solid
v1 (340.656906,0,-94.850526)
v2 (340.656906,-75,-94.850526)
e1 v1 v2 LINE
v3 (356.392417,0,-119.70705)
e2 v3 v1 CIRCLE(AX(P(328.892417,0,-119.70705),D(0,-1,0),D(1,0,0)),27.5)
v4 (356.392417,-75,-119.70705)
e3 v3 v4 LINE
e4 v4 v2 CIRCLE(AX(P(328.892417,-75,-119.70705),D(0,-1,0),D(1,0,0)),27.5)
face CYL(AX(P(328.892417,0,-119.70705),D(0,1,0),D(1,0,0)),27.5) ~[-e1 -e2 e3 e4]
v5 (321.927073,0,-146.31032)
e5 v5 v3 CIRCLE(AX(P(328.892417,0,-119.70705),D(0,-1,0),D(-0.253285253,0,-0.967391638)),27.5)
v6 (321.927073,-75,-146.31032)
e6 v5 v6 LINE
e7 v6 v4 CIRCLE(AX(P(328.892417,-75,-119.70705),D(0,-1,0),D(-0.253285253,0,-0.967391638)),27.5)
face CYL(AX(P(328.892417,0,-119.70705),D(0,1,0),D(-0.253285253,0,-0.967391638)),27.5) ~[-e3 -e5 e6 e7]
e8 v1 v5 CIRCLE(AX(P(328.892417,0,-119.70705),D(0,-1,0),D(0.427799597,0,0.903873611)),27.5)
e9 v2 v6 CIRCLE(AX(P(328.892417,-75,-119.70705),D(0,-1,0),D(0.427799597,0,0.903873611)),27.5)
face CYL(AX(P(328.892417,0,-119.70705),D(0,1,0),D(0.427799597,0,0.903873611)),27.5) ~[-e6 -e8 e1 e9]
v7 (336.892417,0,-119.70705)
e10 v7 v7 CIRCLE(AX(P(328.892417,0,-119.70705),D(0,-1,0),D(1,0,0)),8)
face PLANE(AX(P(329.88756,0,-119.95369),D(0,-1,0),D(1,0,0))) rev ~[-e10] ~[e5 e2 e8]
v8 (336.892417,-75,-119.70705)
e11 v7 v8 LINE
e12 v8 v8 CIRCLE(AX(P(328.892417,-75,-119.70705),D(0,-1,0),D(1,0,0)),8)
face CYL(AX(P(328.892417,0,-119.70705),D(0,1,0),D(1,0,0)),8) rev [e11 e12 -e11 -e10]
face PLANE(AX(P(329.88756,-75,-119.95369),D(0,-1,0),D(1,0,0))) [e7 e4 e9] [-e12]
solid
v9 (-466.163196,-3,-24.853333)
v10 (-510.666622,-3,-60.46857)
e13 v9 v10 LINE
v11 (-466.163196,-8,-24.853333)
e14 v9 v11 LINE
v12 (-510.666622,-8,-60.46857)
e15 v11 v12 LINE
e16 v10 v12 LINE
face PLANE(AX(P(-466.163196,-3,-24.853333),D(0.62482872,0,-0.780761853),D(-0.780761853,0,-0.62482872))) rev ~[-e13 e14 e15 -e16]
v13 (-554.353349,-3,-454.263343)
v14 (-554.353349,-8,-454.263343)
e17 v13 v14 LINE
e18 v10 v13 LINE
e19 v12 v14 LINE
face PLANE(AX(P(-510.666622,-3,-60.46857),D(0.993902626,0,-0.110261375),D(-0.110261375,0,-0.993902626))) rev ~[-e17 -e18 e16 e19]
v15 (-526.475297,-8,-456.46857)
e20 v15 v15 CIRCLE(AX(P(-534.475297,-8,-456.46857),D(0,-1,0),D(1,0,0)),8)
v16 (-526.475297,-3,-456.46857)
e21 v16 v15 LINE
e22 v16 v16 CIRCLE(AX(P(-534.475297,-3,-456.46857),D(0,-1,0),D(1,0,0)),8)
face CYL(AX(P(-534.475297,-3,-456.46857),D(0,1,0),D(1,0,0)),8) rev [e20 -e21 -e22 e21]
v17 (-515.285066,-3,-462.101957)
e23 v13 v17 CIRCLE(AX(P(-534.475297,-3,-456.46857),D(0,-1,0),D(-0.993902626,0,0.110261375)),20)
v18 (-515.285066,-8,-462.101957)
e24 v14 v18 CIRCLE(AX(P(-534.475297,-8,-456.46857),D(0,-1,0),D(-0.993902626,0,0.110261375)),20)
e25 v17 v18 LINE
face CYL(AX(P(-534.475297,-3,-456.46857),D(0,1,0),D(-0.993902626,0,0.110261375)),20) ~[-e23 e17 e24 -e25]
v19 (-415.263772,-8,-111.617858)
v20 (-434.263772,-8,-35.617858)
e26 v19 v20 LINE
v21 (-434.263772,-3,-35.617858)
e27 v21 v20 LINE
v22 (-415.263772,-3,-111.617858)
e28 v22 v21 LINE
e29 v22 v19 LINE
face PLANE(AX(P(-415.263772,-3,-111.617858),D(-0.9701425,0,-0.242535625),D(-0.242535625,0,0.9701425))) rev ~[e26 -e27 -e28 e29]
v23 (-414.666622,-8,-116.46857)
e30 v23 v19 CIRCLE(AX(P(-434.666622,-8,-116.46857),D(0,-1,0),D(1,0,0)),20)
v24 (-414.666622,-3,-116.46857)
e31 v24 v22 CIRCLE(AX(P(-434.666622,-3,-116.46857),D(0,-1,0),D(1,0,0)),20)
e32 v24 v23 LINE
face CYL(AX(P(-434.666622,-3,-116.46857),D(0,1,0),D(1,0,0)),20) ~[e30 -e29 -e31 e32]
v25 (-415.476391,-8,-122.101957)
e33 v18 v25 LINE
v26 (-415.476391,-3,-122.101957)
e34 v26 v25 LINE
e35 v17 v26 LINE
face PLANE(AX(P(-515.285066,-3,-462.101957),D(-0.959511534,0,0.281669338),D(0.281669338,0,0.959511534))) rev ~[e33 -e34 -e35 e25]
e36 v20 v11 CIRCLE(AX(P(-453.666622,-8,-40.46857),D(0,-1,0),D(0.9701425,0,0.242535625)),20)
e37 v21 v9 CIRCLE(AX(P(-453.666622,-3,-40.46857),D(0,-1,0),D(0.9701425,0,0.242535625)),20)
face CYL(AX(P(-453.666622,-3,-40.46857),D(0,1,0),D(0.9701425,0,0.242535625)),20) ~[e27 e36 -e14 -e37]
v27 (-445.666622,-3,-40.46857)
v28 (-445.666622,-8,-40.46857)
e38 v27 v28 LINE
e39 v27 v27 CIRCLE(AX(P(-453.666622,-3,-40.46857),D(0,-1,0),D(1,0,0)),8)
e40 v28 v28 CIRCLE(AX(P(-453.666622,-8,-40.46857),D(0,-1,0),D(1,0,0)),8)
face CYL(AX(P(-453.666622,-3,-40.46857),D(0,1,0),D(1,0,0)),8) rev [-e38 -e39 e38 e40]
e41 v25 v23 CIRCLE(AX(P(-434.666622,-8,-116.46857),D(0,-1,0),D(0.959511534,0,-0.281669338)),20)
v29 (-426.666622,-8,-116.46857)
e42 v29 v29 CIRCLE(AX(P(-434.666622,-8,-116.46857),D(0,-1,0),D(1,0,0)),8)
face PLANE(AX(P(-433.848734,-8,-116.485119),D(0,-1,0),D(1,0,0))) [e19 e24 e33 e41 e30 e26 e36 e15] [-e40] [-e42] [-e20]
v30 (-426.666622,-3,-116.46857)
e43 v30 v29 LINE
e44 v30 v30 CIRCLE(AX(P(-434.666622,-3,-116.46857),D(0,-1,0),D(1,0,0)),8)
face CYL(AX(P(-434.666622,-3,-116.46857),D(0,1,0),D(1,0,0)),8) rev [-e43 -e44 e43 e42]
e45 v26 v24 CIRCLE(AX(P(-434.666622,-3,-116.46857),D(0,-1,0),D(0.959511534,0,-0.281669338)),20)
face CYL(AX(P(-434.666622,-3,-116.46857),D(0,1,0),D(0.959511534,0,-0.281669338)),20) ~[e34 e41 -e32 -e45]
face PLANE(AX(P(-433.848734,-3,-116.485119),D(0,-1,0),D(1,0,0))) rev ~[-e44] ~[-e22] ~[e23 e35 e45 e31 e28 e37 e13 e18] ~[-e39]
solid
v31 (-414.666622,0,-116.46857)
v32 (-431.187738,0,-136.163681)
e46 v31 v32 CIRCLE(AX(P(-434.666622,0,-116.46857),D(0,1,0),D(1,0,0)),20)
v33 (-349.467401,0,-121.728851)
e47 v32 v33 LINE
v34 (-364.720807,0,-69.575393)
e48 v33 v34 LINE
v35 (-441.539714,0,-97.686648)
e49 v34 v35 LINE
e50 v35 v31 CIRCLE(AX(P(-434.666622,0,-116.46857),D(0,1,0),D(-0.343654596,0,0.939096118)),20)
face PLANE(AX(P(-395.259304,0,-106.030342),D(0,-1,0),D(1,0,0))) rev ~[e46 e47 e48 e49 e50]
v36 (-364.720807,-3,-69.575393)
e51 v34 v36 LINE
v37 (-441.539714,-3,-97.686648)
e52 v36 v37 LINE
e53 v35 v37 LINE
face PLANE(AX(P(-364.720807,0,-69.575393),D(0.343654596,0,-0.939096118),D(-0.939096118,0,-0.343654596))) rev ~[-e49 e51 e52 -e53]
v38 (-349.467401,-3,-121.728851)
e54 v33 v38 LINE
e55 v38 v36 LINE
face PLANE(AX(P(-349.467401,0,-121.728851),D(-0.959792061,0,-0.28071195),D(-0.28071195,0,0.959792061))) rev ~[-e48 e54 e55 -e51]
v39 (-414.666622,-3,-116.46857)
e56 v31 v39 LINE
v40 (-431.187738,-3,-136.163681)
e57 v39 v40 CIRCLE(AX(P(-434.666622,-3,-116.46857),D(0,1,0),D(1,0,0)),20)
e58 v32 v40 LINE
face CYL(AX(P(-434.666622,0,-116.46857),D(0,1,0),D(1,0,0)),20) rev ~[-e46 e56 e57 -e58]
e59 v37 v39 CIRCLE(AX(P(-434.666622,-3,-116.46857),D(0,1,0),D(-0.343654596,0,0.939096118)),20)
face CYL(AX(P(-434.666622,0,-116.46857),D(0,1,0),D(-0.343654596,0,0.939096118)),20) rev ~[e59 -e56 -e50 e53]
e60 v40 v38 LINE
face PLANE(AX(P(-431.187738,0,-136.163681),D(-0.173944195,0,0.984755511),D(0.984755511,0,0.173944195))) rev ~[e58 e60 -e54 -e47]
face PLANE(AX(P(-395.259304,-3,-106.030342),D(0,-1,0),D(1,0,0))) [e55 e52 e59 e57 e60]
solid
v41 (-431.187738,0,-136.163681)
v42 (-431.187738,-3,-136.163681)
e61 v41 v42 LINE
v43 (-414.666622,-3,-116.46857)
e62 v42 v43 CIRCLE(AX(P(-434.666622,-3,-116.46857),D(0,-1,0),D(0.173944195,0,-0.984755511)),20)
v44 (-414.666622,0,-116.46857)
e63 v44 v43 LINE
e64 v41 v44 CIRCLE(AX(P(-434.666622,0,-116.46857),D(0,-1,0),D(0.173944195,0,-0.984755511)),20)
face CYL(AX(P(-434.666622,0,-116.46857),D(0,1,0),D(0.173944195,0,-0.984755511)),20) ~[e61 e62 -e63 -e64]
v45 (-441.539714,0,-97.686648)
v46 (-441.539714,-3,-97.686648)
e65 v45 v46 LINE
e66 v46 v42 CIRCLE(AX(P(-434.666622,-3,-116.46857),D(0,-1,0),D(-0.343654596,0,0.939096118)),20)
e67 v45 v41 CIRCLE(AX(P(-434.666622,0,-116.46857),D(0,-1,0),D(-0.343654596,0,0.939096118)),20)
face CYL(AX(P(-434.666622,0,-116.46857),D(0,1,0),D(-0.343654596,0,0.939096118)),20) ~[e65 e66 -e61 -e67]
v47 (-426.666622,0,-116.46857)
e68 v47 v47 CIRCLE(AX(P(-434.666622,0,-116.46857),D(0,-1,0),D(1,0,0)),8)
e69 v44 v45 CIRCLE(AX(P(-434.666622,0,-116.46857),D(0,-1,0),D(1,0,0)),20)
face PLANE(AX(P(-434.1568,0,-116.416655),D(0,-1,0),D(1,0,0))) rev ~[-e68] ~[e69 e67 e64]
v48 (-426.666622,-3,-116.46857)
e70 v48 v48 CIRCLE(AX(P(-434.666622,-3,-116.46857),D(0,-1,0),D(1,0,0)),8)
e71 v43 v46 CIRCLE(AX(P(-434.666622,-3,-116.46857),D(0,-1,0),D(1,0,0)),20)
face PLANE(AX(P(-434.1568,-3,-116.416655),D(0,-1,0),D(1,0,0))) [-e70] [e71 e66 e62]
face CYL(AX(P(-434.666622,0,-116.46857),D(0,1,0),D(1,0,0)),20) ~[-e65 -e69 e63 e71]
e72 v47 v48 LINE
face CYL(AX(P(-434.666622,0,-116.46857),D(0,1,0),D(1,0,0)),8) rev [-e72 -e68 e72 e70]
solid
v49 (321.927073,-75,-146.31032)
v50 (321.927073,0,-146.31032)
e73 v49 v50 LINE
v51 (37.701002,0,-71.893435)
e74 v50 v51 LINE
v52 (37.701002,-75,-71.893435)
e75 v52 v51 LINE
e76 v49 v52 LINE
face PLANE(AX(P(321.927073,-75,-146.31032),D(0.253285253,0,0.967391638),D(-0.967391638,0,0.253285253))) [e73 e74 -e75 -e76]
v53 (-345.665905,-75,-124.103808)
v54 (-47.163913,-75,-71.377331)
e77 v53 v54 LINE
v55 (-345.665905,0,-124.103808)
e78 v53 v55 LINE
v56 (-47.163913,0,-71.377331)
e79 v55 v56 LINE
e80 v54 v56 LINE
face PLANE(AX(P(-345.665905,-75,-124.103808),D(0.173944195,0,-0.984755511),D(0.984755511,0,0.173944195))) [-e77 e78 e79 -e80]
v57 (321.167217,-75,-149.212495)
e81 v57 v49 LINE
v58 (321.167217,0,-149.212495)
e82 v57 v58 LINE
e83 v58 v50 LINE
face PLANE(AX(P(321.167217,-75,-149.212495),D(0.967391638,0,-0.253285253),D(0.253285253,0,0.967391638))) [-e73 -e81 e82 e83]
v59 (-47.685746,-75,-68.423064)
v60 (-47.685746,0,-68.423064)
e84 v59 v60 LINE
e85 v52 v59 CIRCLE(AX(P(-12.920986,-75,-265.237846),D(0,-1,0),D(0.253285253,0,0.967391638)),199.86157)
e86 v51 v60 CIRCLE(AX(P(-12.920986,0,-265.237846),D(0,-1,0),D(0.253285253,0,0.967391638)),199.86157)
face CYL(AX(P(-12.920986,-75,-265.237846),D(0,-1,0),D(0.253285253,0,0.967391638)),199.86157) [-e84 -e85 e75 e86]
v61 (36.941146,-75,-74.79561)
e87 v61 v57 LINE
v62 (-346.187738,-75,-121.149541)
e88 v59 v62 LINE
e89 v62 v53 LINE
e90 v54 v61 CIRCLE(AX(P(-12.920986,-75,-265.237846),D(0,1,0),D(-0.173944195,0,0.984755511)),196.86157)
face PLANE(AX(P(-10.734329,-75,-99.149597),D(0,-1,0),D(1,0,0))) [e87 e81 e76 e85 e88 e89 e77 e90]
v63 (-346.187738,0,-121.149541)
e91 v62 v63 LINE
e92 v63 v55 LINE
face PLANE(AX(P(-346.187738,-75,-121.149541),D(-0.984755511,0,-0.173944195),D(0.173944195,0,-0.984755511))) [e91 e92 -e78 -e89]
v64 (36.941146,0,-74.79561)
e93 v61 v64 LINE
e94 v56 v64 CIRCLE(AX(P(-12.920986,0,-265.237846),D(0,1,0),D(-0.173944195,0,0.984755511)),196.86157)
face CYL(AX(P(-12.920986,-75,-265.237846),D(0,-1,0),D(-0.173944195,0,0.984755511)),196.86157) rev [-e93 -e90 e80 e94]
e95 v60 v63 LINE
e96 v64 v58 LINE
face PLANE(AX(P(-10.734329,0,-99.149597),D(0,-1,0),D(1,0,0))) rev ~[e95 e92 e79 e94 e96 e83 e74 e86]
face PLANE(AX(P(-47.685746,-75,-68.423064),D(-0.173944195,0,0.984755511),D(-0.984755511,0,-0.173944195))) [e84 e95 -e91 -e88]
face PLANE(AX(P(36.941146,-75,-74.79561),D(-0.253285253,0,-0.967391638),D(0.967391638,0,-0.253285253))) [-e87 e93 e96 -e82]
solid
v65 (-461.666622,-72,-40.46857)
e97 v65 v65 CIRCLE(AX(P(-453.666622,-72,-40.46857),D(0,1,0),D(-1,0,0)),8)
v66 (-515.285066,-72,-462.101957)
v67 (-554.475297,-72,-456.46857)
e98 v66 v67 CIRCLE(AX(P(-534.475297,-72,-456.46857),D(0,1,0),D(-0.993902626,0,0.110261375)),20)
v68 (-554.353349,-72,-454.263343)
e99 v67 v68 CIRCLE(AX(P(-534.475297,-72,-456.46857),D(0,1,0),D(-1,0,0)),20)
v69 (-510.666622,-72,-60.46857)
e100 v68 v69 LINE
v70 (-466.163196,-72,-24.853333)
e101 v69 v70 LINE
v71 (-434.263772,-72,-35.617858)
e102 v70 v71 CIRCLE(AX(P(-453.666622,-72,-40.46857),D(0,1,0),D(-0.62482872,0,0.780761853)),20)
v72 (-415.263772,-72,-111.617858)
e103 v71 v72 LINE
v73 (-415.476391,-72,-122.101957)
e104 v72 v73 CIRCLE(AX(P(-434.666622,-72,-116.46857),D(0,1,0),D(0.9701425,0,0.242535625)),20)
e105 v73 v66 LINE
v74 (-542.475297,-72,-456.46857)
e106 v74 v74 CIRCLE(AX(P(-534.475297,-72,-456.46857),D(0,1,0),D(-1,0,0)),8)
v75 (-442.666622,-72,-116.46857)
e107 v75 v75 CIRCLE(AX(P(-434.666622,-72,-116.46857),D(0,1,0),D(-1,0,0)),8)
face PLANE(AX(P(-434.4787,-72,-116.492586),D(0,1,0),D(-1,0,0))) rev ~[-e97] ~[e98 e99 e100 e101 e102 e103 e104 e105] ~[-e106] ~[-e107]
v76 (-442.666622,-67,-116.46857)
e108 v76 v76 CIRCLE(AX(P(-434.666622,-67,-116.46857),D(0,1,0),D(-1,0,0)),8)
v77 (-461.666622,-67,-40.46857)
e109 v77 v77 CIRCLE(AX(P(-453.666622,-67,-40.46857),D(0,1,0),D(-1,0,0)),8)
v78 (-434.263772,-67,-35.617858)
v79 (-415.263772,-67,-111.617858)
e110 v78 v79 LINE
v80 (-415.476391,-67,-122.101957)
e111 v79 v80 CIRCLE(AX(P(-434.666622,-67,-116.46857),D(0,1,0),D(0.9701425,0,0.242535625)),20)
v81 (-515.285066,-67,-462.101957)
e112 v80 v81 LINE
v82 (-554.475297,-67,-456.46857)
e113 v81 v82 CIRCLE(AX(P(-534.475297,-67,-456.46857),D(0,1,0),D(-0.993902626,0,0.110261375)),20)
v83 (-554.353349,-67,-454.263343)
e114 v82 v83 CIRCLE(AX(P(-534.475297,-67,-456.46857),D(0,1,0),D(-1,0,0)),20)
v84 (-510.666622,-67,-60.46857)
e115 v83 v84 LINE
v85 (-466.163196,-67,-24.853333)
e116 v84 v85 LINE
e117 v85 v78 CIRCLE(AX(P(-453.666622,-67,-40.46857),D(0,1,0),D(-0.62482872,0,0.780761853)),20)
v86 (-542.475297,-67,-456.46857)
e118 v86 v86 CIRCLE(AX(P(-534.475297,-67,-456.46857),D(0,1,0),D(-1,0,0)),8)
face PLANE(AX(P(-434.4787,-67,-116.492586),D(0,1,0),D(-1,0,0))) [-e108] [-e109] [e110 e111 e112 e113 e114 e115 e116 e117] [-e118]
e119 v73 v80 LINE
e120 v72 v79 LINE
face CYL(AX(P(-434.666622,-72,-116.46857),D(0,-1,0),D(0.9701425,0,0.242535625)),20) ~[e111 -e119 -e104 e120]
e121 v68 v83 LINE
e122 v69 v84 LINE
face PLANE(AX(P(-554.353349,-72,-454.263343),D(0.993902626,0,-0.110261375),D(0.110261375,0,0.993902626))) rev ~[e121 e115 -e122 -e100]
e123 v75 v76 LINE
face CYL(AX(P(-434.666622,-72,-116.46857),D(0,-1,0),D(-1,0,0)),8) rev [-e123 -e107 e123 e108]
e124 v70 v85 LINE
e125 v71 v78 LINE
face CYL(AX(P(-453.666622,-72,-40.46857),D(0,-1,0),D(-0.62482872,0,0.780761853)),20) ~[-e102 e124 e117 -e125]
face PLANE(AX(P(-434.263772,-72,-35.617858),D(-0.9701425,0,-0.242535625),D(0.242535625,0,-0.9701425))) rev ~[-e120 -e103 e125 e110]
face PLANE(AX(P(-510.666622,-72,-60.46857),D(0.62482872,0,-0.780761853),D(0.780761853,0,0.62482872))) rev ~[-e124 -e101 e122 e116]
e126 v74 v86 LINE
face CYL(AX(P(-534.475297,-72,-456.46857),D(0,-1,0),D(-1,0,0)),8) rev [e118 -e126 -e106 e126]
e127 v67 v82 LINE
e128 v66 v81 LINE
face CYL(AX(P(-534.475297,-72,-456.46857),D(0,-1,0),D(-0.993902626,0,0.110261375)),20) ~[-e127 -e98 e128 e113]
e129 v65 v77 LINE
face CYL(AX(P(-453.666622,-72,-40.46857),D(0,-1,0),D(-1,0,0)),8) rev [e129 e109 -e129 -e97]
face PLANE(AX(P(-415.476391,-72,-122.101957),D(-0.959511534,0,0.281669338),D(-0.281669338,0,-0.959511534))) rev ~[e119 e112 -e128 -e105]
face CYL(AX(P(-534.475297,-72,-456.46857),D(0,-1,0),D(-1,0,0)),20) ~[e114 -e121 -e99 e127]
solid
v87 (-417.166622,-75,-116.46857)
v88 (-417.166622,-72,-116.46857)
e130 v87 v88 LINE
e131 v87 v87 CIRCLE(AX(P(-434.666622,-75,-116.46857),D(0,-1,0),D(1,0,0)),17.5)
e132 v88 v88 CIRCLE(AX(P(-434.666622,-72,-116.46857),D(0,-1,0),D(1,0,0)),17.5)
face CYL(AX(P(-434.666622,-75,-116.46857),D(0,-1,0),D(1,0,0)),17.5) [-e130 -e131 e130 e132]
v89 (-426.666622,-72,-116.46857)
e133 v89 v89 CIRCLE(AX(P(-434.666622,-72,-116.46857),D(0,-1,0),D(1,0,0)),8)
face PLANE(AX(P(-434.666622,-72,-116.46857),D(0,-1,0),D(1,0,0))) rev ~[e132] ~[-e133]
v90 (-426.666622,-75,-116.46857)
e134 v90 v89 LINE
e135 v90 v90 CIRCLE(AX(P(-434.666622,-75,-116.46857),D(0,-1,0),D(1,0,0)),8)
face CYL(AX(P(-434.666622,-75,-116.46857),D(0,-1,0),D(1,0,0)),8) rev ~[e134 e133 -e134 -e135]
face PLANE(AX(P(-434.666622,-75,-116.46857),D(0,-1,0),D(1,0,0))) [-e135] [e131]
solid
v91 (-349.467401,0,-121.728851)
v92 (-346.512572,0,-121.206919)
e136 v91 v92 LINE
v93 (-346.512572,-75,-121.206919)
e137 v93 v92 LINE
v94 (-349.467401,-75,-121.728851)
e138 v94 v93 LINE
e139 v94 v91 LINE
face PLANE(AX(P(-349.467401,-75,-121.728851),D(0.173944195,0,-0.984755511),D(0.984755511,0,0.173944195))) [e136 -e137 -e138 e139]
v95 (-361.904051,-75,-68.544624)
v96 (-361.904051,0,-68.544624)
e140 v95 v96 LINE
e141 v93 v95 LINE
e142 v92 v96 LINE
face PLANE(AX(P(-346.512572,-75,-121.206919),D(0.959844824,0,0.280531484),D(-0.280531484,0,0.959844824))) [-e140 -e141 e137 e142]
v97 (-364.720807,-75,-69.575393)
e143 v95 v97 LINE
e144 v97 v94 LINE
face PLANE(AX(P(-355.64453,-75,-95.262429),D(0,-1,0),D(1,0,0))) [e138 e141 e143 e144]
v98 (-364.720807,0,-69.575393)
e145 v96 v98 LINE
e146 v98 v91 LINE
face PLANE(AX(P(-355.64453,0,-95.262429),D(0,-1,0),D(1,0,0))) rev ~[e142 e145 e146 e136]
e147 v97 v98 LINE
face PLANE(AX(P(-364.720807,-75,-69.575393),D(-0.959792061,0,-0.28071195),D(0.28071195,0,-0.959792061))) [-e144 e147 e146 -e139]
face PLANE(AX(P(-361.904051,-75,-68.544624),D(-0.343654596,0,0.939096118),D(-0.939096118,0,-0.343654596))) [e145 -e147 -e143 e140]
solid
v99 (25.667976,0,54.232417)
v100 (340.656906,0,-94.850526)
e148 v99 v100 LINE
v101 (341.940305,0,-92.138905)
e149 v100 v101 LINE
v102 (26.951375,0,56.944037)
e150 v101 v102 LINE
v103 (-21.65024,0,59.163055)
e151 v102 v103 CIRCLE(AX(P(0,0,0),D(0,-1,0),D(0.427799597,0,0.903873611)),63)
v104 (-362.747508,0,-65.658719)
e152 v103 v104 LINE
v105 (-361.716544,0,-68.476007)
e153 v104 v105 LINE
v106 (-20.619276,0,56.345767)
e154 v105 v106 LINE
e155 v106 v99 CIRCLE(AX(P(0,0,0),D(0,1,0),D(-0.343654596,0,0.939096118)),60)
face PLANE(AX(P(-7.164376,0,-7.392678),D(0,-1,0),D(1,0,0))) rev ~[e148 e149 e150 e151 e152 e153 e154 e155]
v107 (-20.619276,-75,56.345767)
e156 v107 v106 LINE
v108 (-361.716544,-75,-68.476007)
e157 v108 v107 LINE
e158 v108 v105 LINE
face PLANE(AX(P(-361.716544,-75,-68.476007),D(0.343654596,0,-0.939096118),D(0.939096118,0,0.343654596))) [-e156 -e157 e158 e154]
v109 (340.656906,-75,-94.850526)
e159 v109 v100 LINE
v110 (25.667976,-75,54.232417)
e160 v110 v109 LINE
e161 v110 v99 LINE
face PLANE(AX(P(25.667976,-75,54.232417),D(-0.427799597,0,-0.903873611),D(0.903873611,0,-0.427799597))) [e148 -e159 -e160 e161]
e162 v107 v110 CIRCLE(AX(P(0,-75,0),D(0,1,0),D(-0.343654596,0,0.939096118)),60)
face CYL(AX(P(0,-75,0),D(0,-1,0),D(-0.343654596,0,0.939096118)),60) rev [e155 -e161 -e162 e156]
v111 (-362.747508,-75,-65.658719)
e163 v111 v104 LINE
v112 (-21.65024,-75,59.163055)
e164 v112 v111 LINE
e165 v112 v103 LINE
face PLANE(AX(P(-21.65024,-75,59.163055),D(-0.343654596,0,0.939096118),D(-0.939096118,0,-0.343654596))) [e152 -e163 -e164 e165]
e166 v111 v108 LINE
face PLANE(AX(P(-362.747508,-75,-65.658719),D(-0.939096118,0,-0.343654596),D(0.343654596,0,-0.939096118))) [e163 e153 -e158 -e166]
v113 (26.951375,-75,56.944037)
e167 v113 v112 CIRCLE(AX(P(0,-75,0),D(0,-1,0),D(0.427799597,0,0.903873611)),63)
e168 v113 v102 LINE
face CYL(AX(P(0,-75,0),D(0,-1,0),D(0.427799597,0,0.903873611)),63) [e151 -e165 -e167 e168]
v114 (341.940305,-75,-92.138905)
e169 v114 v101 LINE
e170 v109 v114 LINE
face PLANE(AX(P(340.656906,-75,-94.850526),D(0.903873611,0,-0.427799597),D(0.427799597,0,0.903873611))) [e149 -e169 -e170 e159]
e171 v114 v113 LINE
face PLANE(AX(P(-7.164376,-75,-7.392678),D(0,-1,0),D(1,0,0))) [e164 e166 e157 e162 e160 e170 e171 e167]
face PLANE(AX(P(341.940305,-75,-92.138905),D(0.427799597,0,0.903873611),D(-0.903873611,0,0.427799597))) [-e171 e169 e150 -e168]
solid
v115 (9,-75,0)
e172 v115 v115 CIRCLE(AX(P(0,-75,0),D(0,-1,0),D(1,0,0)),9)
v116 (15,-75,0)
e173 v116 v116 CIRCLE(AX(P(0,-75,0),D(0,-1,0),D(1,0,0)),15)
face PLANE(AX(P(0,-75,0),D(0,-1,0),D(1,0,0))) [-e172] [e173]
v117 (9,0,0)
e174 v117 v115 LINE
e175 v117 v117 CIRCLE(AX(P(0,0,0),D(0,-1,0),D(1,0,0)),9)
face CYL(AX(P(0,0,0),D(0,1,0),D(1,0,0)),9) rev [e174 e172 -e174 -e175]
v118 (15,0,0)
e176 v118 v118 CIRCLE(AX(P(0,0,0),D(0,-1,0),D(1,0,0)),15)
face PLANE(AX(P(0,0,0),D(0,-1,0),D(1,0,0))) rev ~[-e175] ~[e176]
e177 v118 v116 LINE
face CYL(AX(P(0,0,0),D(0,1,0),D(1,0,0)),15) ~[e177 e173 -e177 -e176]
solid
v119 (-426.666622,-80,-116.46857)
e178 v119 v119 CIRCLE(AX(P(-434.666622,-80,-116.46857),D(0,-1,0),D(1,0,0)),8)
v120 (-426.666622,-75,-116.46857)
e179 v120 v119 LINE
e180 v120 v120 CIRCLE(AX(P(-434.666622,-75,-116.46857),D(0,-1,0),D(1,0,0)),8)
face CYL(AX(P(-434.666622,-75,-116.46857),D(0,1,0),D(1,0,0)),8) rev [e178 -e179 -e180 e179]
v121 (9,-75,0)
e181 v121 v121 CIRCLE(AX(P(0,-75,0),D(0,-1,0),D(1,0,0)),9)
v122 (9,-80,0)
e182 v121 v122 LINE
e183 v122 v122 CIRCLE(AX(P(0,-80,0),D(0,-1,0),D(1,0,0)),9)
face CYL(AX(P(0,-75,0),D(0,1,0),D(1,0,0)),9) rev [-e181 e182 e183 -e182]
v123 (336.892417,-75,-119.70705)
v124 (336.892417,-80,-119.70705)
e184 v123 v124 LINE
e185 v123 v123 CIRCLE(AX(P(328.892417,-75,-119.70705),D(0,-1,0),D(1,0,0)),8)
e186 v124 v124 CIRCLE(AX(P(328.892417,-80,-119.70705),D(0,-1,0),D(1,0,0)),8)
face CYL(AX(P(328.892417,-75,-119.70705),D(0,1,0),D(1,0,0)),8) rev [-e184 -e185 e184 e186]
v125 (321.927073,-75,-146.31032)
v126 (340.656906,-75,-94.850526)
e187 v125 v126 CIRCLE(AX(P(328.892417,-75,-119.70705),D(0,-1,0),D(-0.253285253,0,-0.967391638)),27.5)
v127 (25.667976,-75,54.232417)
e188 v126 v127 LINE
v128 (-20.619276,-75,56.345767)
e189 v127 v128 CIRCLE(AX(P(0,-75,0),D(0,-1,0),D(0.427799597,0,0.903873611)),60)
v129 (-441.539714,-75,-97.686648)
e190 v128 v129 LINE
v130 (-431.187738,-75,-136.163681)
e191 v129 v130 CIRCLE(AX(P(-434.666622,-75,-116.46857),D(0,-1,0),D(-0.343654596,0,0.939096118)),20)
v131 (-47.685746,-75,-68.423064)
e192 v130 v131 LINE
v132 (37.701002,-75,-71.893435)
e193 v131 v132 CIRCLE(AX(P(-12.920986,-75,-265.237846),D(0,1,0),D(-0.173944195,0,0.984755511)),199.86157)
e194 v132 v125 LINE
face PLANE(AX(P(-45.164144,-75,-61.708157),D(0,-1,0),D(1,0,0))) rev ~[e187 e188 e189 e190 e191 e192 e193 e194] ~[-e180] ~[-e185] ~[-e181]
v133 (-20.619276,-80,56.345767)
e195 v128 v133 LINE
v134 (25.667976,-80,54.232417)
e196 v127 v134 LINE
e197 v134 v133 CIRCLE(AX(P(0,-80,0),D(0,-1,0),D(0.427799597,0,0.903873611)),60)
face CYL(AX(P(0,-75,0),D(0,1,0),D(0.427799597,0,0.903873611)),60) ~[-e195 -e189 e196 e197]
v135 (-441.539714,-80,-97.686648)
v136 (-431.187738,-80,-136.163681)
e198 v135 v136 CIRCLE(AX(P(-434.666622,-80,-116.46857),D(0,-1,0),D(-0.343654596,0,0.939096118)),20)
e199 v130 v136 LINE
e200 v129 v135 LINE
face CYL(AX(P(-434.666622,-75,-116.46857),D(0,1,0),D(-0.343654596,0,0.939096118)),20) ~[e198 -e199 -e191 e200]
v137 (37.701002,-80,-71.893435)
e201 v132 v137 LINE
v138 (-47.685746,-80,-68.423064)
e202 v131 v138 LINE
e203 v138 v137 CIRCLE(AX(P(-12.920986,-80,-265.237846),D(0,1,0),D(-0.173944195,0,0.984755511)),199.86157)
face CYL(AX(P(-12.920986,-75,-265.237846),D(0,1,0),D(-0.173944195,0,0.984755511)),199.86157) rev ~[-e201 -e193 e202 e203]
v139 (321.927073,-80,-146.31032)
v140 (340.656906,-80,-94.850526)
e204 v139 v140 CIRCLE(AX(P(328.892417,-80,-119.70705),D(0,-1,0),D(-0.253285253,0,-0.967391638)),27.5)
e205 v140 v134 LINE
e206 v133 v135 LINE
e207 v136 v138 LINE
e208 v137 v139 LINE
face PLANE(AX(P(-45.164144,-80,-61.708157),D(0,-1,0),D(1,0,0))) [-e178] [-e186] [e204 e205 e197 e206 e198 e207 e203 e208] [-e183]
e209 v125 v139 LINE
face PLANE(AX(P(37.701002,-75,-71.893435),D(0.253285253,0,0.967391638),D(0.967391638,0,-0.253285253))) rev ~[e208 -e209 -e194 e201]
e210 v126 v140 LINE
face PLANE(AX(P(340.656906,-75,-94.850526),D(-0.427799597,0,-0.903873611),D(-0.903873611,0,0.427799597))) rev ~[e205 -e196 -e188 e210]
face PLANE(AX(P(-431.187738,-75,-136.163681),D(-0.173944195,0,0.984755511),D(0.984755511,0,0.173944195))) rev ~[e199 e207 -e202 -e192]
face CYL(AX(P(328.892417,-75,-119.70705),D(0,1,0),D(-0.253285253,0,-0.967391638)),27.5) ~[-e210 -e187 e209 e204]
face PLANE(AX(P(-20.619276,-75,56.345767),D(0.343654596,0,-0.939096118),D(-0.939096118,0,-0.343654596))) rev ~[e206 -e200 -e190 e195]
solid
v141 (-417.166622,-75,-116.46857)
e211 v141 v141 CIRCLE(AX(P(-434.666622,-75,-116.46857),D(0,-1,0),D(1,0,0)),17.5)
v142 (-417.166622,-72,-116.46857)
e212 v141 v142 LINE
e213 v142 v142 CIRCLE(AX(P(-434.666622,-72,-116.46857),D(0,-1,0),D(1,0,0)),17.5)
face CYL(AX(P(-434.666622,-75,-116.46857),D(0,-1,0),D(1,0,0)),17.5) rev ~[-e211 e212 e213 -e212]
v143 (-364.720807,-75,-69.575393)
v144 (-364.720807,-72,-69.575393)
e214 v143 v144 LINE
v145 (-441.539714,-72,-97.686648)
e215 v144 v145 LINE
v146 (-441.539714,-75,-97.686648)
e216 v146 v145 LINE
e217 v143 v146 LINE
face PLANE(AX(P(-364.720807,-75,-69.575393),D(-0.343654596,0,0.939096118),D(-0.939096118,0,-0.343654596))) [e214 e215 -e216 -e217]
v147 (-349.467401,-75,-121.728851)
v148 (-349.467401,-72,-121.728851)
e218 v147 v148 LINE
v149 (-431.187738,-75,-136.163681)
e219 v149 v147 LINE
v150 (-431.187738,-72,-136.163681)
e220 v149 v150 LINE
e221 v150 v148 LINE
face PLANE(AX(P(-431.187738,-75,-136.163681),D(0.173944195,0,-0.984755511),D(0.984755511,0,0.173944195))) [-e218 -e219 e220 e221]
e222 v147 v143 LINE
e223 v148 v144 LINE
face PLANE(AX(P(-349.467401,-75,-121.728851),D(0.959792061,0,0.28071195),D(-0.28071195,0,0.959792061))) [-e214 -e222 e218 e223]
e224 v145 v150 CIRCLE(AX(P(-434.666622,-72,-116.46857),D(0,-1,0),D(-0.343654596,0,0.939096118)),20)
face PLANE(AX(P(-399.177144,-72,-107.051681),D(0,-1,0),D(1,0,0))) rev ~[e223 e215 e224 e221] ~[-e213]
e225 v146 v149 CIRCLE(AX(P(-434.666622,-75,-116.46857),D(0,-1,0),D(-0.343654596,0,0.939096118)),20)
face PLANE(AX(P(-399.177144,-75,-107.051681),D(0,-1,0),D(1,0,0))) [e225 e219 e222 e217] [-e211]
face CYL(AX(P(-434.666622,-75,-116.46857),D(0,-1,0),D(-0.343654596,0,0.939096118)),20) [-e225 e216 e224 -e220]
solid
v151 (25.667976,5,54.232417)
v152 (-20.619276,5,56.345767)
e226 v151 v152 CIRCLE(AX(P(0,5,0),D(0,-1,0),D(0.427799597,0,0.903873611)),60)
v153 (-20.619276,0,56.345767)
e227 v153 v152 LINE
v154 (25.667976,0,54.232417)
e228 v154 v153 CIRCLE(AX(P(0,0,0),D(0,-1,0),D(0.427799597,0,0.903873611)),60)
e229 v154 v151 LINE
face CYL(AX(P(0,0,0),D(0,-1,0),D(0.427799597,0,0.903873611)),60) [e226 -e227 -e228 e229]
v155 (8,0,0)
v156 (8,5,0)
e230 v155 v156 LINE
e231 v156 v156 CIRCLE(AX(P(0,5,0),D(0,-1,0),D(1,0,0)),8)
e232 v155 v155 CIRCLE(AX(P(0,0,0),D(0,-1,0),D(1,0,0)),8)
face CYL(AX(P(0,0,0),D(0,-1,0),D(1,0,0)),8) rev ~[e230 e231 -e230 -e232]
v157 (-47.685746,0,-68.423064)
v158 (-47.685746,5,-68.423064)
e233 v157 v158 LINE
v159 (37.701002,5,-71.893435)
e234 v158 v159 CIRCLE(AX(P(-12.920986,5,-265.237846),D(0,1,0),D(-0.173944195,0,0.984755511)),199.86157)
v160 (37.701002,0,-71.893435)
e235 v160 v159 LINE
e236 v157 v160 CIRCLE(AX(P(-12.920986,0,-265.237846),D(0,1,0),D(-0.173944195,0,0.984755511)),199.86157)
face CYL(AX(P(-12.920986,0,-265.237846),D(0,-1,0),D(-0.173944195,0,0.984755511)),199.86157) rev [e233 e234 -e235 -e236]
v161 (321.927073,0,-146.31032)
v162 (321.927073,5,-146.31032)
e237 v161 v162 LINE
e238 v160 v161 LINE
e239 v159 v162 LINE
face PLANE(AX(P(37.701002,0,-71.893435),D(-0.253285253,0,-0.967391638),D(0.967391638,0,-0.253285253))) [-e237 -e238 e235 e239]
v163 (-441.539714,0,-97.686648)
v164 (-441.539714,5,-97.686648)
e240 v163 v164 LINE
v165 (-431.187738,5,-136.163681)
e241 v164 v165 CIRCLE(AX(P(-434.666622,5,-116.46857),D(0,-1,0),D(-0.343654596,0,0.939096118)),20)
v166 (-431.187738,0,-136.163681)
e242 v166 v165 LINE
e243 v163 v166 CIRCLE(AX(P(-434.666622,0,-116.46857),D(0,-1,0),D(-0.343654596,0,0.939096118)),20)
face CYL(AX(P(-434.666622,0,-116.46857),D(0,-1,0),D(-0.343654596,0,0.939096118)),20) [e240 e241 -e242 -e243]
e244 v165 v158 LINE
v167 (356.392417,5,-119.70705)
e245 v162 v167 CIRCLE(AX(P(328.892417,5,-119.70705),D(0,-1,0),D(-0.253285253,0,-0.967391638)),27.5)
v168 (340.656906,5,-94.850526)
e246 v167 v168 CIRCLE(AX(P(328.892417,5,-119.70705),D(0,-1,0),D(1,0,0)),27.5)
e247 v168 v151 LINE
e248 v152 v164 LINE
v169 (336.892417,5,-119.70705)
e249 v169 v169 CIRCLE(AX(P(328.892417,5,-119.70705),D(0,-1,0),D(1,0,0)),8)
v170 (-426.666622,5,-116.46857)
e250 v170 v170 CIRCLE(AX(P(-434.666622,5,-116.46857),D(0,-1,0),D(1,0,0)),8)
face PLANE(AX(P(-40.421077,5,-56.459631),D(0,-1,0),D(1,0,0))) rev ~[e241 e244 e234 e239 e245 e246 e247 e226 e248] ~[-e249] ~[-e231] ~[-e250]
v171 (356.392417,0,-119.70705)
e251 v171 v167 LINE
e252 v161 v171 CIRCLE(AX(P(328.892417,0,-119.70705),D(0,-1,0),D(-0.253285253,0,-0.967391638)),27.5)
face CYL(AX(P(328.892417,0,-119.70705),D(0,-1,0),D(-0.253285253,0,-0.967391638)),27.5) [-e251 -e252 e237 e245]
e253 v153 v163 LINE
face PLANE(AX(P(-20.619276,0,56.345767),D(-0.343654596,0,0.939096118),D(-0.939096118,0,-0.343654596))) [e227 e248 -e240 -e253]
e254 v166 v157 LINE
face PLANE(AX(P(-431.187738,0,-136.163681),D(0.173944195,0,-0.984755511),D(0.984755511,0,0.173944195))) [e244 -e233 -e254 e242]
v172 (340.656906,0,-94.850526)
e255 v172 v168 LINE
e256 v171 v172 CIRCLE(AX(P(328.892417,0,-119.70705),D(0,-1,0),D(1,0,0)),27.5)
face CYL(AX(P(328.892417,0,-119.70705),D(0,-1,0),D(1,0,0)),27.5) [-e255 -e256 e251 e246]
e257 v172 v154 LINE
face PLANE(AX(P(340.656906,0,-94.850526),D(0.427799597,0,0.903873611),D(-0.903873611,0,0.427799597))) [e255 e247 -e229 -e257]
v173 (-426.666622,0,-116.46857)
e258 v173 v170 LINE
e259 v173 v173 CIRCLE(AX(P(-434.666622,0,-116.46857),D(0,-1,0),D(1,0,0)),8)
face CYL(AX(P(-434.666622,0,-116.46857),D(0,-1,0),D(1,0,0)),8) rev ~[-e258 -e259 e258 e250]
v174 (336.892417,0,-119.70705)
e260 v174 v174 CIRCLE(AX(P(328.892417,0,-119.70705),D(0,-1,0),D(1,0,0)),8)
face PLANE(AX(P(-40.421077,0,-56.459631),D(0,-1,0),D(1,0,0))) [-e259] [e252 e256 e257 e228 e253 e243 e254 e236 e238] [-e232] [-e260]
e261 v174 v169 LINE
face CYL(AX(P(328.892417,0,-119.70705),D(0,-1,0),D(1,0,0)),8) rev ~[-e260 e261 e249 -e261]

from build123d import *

# Parameters (mm, degrees)
F0_R      = 17.5
F0_R_2    = 8
F1_DEPTH  = 5
F0_R_3    = 15
F0_R_4    = 22.5
F0_R_5    = 9
F2_DEPTH  = 5
F4_R      = 17.5
F4_R_2    = 22.5
F4_R_3    = 9
F4_R_4    = 8
F5_DEPTH  = 5
F6_DEPTH  = 75
F7_DEPTH  = 75
F9_DEPTH  = 75
F10_DEPTH = 75
F11_DEPTH = 75
F8_R      = 17.5
F12_DEPTH = 3
F14_DEPTH = 3
F16_R     = 17.5
F16_R_2   = 8
F17_DEPTH = 5
F19_R     = 17.5
F19_R_2   = 8
F20_DEPTH = 5


# Not quite as in the source:
# - a feature names something its author has since deleted; it is built from what else it names


with BuildPart() as f1:
    # F0 (on Front) → F1 (new body)
    with BuildSketch(Plane.XZ):
        with Locations((-434.6666218301, -116.4685702961)):
            Circle(F0_R)
        with Locations((-434.6666218301, -116.4685702961)):
            Circle(F0_R_2, mode=Mode.SUBTRACT)
    extrude(amount=F1_DEPTH)


with BuildPart() as f2:
    # F0 (on Front) → F2 (new body)
    with BuildSketch(Plane.XZ):
        with BuildLine():
            ThreePointArc((25.6679758413, 54.2324166547), (50.6955547878, 32.0930011803), (60, 0))
            ThreePointArc((60, 0), (-34.3718158899, -49.1790430207), (-20.6192757477, 56.3457670783))
            Line((-20.6192757477, 56.3457670783), (-441.539713746, -97.6866479367))
            ThreePointArc((-441.539713746, -97.6866479367), (-423.2093498668, -100.0755559559), (-414.6666218301, -116.4685702961))
            ThreePointArc((-414.6666218301, -116.4685702961), (-419.3438009709, -129.3220196743), (-431.1877379217, -136.1636805206))
            Line((-431.1877379217, -136.1636805206), (-47.6857460535, -68.4230640354))
            ThreePointArc((-47.6857460535, -68.4230640354), (-4.8047190164, -65.5411431254), (37.7010021837, -71.8934350856))
            Line((37.7010021837, -71.8934350856), (321.927072804, -146.310320196))
            ThreePointArc((321.927072804, -146.310320196), (303.0508702035, -110.3014962225), (340.6569062023, -94.8505258639))
            Line((340.6569062023, -94.8505258639), (25.6679758413, 54.2324166547))
        make_face()
        with BuildLine():
            ThreePointArc((-20.6192757477, 56.3457670783), (-34.3718158899, -49.1790430207), (60, 0))
            ThreePointArc((60, 0), (50.6955547878, 32.0930011803), (25.6679758413, 54.2324166547))
            ThreePointArc((25.6679758413, 54.2324166547), (2.7365864982, 59.9375599632), (-20.6192757477, 56.3457670783))
        make_face()
        Circle(F0_R_3, mode=Mode.SUBTRACT)
        with BuildLine():
            ThreePointArc((356.3924172751, -119.707050164), (352.1278798861, -104.9977579563), (340.6569062023, -94.8505258639))
            ThreePointArc((340.6569062023, -94.8505258639), (303.0508702035, -110.3014962225), (321.927072804, -146.310320196))
            ThreePointArc((321.927072804, -146.310320196), (345.6957358021, -141.476259761), (356.3924172751, -119.707050164))
        make_face()
        with Locations((328.8924172751, -119.707050164)):
            Circle(F0_R_4, mode=Mode.SUBTRACT)
        with Locations((328.8924172751, -119.707050164)):
            Circle(F0_R_4)
        with Locations((328.8924172751, -119.707050164)):
            Circle(F0_R_2, mode=Mode.SUBTRACT)
        with BuildLine():
            ThreePointArc((-414.6666218301, -116.4685702961), (-423.2093498668, -100.0755559559), (-441.539713746, -97.6866479367))
            ThreePointArc((-441.539713746, -97.6866479367), (-453.9798471204, -121.6646581405), (-431.1877379217, -136.1636805206))
            ThreePointArc((-431.1877379217, -136.1636805206), (-419.3438009709, -129.3220196743), (-414.6666218301, -116.4685702961))
        make_face()
        with Locations((-434.6666218301, -116.4685702961)):
            Circle(F0_R, mode=Mode.SUBTRACT)
        with Locations((-434.6666218301, -116.4685702961)):
            Circle(F0_R)
        with Locations((-434.6666218301, -116.4685702961)):
            Circle(F0_R_2, mode=Mode.SUBTRACT)
        Circle(F0_R_3)
        Circle(F0_R_5, mode=Mode.SUBTRACT)
        Circle(F0_R_5)
        Circle(F0_R_2, mode=Mode.SUBTRACT)
    extrude(amount=-F2_DEPTH)


with BuildPart() as f5:
    # F4 (on offset) → F5 (new body)
    with BuildSketch(Plane.XZ.offset(75)):
        with BuildLine():
            Line((340.6569062023, -94.8505258639), (25.6679758413, 54.2324166547))
            ThreePointArc((25.6679758413, 54.2324166547), (2.7365864982, 59.9375599632), (-20.6192757477, 56.3457670783))
            Line((-20.6192757477, 56.3457670783), (-441.539713746, -97.6866479367))
            ThreePointArc((-441.539713746, -97.6866479367), (-453.9798471204, -121.6646581405), (-431.1877379217, -136.1636805206))
            Line((-431.1877379217, -136.1636805206), (-47.6857460535, -68.4230640354))
            ThreePointArc((-47.6857460535, -68.4230640354), (-4.8047190164, -65.5411431254), (37.7010021837, -71.8934350856))
            Line((37.7010021837, -71.8934350856), (321.927072804, -146.310320196))
            ThreePointArc((321.927072804, -146.310320196), (354.7339643467, -129.1126041054), (340.6569062023, -94.8505258639))
        make_face()
        with Locations((-434.6666218301, -116.4685702961)):
            Circle(F4_R, mode=Mode.SUBTRACT)
        with Locations((328.8924172751, -119.707050164)):
            Circle(F4_R_2, mode=Mode.SUBTRACT)
        Circle(F4_R_3, mode=Mode.SUBTRACT)
        with Locations((328.8924172751, -119.707050164)):
            Circle(F4_R_2)
        with Locations((328.8924172751, -119.707050164)):
            Circle(F4_R_4, mode=Mode.SUBTRACT)
        with Locations((-434.6666218301, -116.4685702961)):
            Circle(F4_R)
        with Locations((-434.6666218301, -116.4685702961)):
            Circle(F4_R_4, mode=Mode.SUBTRACT)
    extrude(amount=F5_DEPTH)


with BuildPart() as f6:
    # F0 (on Front) → F6 (new body, through all)
    with BuildSketch(Plane.XZ):
        with BuildLine():
            ThreePointArc((356.3924172751, -119.707050164), (352.1278798861, -104.9977579563), (340.6569062023, -94.8505258639))
            ThreePointArc((340.6569062023, -94.8505258639), (303.0508702035, -110.3014962225), (321.927072804, -146.310320196))
            ThreePointArc((321.927072804, -146.310320196), (345.6957358021, -141.476259761), (356.3924172751, -119.707050164))
        make_face()
        with Locations((328.8924172751, -119.707050164)):
            Circle(F0_R_4, mode=Mode.SUBTRACT)
        with Locations((328.8924172751, -119.707050164)):
            Circle(F0_R_4)
        with Locations((328.8924172751, -119.707050164)):
            Circle(F0_R_2, mode=Mode.SUBTRACT)
    extrude(amount=F6_DEPTH)


with BuildPart() as f7:
    # F0 (on Front) → F7 (new body, through all)
    with BuildSketch(Plane.XZ):
        Circle(F0_R_3)
        Circle(F0_R_5, mode=Mode.SUBTRACT)
    extrude(amount=F7_DEPTH)


with BuildPart() as f9:
    # F8 (on face) → F9 (new body, through all)
    with BuildSketch(Plane.XZ.offset(75)):
        with BuildLine():
            Line((-361.7165437184, -68.4760072941), (-20.6192757477, 56.3457670783))
            ThreePointArc((-20.6192757477, 56.3457670783), (2.7365864982, 59.9375599632), (25.6679758413, 54.2324166547))
            Line((25.6679758413, 54.2324166547), (340.6569062023, -94.8505258639))
            Line((340.6569062023, -94.8505258639), (341.9403049944, -92.1389050312))
            Line((341.9403049944, -92.1389050312), (26.9513746334, 56.9440374875))
            ThreePointArc((26.9513746334, 56.9440374875), (2.8734158231, 62.9344379613), (-21.6502395351, 59.1630554322))
            Line((-21.6502395351, 59.1630554322), (-362.7475075058, -65.6587189402))
            Line((-362.7475075058, -65.6587189402), (-361.7165437184, -68.4760072941))
        make_face()
    extrude(amount=-F9_DEPTH)


with BuildPart() as f10:
    # F8 (on face) → F10 (new body, through all)
    with BuildSketch(Plane.XZ.offset(75)):
        with BuildLine():
            Line((321.1672170435, -149.2124951086), (321.927072804, -146.310320196))
            Line((321.927072804, -146.310320196), (37.7010021837, -71.8934350856))
            ThreePointArc((37.7010021837, -71.8934350856), (-4.8047190164, -65.5411431254), (-47.6857460535, -68.4230640354))
            Line((-47.6857460535, -68.4230640354), (-346.1877379217, -121.1495410289))
            Line((-346.1877379217, -121.1495410289), (-345.6659053354, -124.1038075626))
            Line((-345.6659053354, -124.1038075626), (-47.1639134672, -71.3773305691))
            ThreePointArc((-47.1639134672, -71.3773305691), (-4.9265473469, -68.5386684143), (36.9411464232, -74.7956099982))
            Line((36.9411464232, -74.7956099982), (321.1672170435, -149.2124951086))
        make_face()
    extrude(amount=-F10_DEPTH)


with BuildPart() as f11:
    # F8 (on face) → F11 (new body, through all)
    with BuildSketch(Plane.XZ.offset(75)):
        Polygon((-346.5125719091, -121.2069187089), (-361.9040511092, -68.5446241006), (-364.7208074131, -69.5753931886), (-349.4674006349, -121.728850599), align=None)
    extrude(amount=-F11_DEPTH)


with BuildPart() as f12:
    # F8 (on face) → F12 (new body)
    with BuildSketch(Plane.XZ.offset(75)):
        with BuildLine():
            Line((-349.4674006349, -121.728850599), (-364.7208074131, -69.5753931886))
            Line((-364.7208074131, -69.5753931886), (-441.539713746, -97.6866479367))
            ThreePointArc((-441.539713746, -97.6866479367), (-453.9798471204, -121.6646581405), (-431.1877379217, -136.1636805206))
            Line((-431.1877379217, -136.1636805206), (-349.4674006349, -121.728850599))
        make_face()
        with Locations((-434.6666218301, -116.4685702961)):
            Circle(F8_R, mode=Mode.SUBTRACT)
    extrude(amount=-F12_DEPTH)


with BuildPart() as f12b:
    # F4 (on offset) → F12, piece 2 (new body)
    with BuildSketch(Plane.XZ.offset(75)):
        with Locations((-434.6666218301, -116.4685702961)):
            Circle(F4_R)
        with Locations((-434.6666218301, -116.4685702961)):
            Circle(F4_R_4, mode=Mode.SUBTRACT)
    extrude(amount=-F12_DEPTH)


with BuildPart() as f14:
    # F13 (on face) → F14 (new body)
    with BuildSketch(Plane.XZ):
        with BuildLine():
            Line((-349.4674006349, -121.728850599), (-364.7208074131, -69.5753931886))
            Line((-364.7208074131, -69.5753931886), (-441.539713746, -97.6866479367))
            ThreePointArc((-441.539713746, -97.6866479367), (-423.2093498668, -100.0755559559), (-414.6666218301, -116.4685702961))
            ThreePointArc((-414.6666218301, -116.4685702961), (-419.3438009709, -129.3220196743), (-431.1877379217, -136.1636805206))
            Line((-431.1877379217, -136.1636805206), (-349.4674006349, -121.728850599))
        make_face()
    extrude(amount=F14_DEPTH)


with BuildPart() as f14b:
    # F0 (on Front) → F14, piece 2 (new body)
    with BuildSketch(Plane.XZ):
        with BuildLine():
            ThreePointArc((-414.6666218301, -116.4685702961), (-423.2093498668, -100.0755559559), (-441.539713746, -97.6866479367))
            ThreePointArc((-441.539713746, -97.6866479367), (-453.9798471204, -121.6646581405), (-431.1877379217, -136.1636805206))
            ThreePointArc((-431.1877379217, -136.1636805206), (-419.3438009709, -129.3220196743), (-414.6666218301, -116.4685702961))
        make_face()
        with Locations((-434.6666218301, -116.4685702961)):
            Circle(F0_R, mode=Mode.SUBTRACT)
        with Locations((-434.6666218301, -116.4685702961)):
            Circle(F0_R)
        with Locations((-434.6666218301, -116.4685702961)):
            Circle(F0_R_2, mode=Mode.SUBTRACT)
    extrude(amount=F14_DEPTH)


with BuildPart() as f17:
    # F16 (on offset) → F17 (new body)
    with BuildSketch(Plane(origin=(0, -72, 0), x_dir=(-1, 0, 0), z_dir=(0, 1, 0))):
        with BuildLine():
            ThreePointArc((415.476391148, -122.1019570545), (437.5122664283, -136.2650928903), (454.6666218301, -116.4685702961))
            ThreePointArc((454.6666218301, -116.4685702961), (437.110287104, -96.6184191625), (415.2637718272, -111.6178577954))
            ThreePointArc((415.2637718272, -111.6178577954), (414.670733415, -116.8740903231), (415.476391148, -122.1019570545))
        make_face()
        with Locations((434.6666218301, -116.4685702961)):
            Circle(F16_R, mode=Mode.SUBTRACT)
        with BuildLine():
            ThreePointArc((415.2637718272, -111.6178577954), (437.110287104, -96.6184191625), (454.6666218301, -116.4685702961))
            ThreePointArc((454.6666218301, -116.4685702961), (437.5122664283, -136.2650928903), (415.476391148, -122.1019570545))
            Line((415.476391148, -122.1019570545), (515.2850661759, -462.1019570545))
            ThreePointArc((515.2850661759, -462.1019570545), (530.5409299312, -436.8593694739), (554.3533493694, -454.26334279))
            Line((554.3533493694, -454.26334279), (510.6666218301, -60.4685702961))
            Line((510.6666218301, -60.4685702961), (466.163196234, -24.8533332449))
            ThreePointArc((466.163196234, -24.8533332449), (471.693428093, -31.8063387153), (473.6666218301, -40.4685702961))
            ThreePointArc((473.6666218301, -40.4685702961), (451.2229565562, -60.3187214298), (434.2637718272, -35.6178577954))
            Line((434.2637718272, -35.6178577954), (415.2637718272, -111.6178577954))
        make_face()
        with BuildLine():
            ThreePointArc((466.163196234, -24.8533332449), (447.2718655515, -21.5184491319), (434.2637718272, -35.6178577954))
            ThreePointArc((434.2637718272, -35.6178577954), (451.2229565562, -60.3187214298), (473.6666218301, -40.4685702961))
            ThreePointArc((473.6666218301, -40.4685702961), (471.693428093, -31.8063387153), (466.163196234, -24.8533332449))
        make_face()
        with Locations((453.6666218301, -40.4685702961)):
            Circle(F16_R_2, mode=Mode.SUBTRACT)
        with BuildLine():
            ThreePointArc((554.3533493694, -454.26334279), (530.5409299312, -436.8593694739), (515.2850661759, -462.1019570545))
            ThreePointArc((515.2850661759, -462.1019570545), (537.3209414562, -476.2650928903), (554.475296858, -456.4685702961))
            ThreePointArc((554.475296858, -456.4685702961), (554.4447867141, -455.364271928), (554.3533493694, -454.26334279))
        make_face()
        with Locations((534.475296858, -456.4685702961)):
            Circle(F16_R_2, mode=Mode.SUBTRACT)
        with Locations((434.6666218301, -116.4685702961)):
            Circle(F16_R)
        with Locations((434.6666218301, -116.4685702961)):
            Circle(F16_R_2, mode=Mode.SUBTRACT)
    extrude(amount=F17_DEPTH)


with BuildPart() as f20:
    # F19 (on face) → F20 (new body)
    with BuildSketch(Plane.XZ.offset(3)):
        with BuildLine():
            ThreePointArc((-415.476391148, -122.1019570545), (-414.8700992359, -119.3142148944), (-414.6666218301, -116.4685702961))
            ThreePointArc((-414.6666218301, -116.4685702961), (-414.8164706964, -114.0249050222), (-415.2637718272, -111.6178577954))
            ThreePointArc((-415.2637718272, -111.6178577954), (-454.6625102451, -116.0630502691), (-415.476391148, -122.1019570545))
        make_face()
        with Locations((-434.6666218301, -116.4685702961)):
            Circle(F19_R, mode=Mode.SUBTRACT)
        with BuildLine():
            ThreePointArc((-415.476391148, -122.1019570545), (-454.6625102451, -116.0630502691), (-415.2637718272, -111.6178577954))
            Line((-415.2637718272, -111.6178577954), (-434.2637718272, -35.6178577954))
            ThreePointArc((-434.2637718272, -35.6178577954), (-433.8164706964, -38.0249050222), (-433.6666218301, -40.4685702961))
            ThreePointArc((-433.6666218301, -40.4685702961), (-462.3288534109, -58.495376559), (-466.163196234, -24.8533332449))
            Line((-466.163196234, -24.8533332449), (-510.6666218301, -60.4685702961))
            Line((-510.6666218301, -60.4685702961), (-554.3533493694, -454.26334279))
            ThreePointArc((-554.3533493694, -454.26334279), (-533.3709984898, -436.49908044), (-514.475296858, -456.4685702961))
            ThreePointArc((-514.475296858, -456.4685702961), (-514.6787742638, -459.3142148944), (-515.2850661759, -462.1019570545))
            Line((-515.2850661759, -462.1019570545), (-415.476391148, -122.1019570545))
        make_face()
        with BuildLine():
            ThreePointArc((-433.6666218301, -40.4685702961), (-433.8164706964, -38.0249050222), (-434.2637718272, -35.6178577954))
            ThreePointArc((-434.2637718272, -35.6178577954), (-447.2718655515, -21.5184491319), (-466.163196234, -24.8533332449))
            ThreePointArc((-466.163196234, -24.8533332449), (-462.3288534109, -58.495376559), (-433.6666218301, -40.4685702961))
        make_face()
        with Locations((-453.6666218301, -40.4685702961)):
            Circle(F19_R_2, mode=Mode.SUBTRACT)
        with BuildLine():
            ThreePointArc((-554.3533493694, -454.26334279), (-538.4096637847, -476.0777711183), (-515.2850661759, -462.1019570545))
            ThreePointArc((-515.2850661759, -462.1019570545), (-514.6787742638, -459.3142148944), (-514.475296858, -456.4685702961))
            ThreePointArc((-514.475296858, -456.4685702961), (-533.3709984898, -436.49908044), (-554.3533493694, -454.26334279))
        make_face()
        with Locations((-534.475296858, -456.4685702961)):
            Circle(F19_R_2, mode=Mode.SUBTRACT)
        with Locations((-434.6666218301, -116.4685702961)):
            Circle(F19_R)
        with Locations((-434.6666218301, -116.4685702961)):
            Circle(F19_R_2, mode=Mode.SUBTRACT)
    extrude(amount=F20_DEPTH)


solid = Compound([f2.part, f5.part, f6.part, f7.part, f9.part, f10.part, f11.part, f12.part, f12b.part, f14.part, f14b.part, f17.part, f20.part])
